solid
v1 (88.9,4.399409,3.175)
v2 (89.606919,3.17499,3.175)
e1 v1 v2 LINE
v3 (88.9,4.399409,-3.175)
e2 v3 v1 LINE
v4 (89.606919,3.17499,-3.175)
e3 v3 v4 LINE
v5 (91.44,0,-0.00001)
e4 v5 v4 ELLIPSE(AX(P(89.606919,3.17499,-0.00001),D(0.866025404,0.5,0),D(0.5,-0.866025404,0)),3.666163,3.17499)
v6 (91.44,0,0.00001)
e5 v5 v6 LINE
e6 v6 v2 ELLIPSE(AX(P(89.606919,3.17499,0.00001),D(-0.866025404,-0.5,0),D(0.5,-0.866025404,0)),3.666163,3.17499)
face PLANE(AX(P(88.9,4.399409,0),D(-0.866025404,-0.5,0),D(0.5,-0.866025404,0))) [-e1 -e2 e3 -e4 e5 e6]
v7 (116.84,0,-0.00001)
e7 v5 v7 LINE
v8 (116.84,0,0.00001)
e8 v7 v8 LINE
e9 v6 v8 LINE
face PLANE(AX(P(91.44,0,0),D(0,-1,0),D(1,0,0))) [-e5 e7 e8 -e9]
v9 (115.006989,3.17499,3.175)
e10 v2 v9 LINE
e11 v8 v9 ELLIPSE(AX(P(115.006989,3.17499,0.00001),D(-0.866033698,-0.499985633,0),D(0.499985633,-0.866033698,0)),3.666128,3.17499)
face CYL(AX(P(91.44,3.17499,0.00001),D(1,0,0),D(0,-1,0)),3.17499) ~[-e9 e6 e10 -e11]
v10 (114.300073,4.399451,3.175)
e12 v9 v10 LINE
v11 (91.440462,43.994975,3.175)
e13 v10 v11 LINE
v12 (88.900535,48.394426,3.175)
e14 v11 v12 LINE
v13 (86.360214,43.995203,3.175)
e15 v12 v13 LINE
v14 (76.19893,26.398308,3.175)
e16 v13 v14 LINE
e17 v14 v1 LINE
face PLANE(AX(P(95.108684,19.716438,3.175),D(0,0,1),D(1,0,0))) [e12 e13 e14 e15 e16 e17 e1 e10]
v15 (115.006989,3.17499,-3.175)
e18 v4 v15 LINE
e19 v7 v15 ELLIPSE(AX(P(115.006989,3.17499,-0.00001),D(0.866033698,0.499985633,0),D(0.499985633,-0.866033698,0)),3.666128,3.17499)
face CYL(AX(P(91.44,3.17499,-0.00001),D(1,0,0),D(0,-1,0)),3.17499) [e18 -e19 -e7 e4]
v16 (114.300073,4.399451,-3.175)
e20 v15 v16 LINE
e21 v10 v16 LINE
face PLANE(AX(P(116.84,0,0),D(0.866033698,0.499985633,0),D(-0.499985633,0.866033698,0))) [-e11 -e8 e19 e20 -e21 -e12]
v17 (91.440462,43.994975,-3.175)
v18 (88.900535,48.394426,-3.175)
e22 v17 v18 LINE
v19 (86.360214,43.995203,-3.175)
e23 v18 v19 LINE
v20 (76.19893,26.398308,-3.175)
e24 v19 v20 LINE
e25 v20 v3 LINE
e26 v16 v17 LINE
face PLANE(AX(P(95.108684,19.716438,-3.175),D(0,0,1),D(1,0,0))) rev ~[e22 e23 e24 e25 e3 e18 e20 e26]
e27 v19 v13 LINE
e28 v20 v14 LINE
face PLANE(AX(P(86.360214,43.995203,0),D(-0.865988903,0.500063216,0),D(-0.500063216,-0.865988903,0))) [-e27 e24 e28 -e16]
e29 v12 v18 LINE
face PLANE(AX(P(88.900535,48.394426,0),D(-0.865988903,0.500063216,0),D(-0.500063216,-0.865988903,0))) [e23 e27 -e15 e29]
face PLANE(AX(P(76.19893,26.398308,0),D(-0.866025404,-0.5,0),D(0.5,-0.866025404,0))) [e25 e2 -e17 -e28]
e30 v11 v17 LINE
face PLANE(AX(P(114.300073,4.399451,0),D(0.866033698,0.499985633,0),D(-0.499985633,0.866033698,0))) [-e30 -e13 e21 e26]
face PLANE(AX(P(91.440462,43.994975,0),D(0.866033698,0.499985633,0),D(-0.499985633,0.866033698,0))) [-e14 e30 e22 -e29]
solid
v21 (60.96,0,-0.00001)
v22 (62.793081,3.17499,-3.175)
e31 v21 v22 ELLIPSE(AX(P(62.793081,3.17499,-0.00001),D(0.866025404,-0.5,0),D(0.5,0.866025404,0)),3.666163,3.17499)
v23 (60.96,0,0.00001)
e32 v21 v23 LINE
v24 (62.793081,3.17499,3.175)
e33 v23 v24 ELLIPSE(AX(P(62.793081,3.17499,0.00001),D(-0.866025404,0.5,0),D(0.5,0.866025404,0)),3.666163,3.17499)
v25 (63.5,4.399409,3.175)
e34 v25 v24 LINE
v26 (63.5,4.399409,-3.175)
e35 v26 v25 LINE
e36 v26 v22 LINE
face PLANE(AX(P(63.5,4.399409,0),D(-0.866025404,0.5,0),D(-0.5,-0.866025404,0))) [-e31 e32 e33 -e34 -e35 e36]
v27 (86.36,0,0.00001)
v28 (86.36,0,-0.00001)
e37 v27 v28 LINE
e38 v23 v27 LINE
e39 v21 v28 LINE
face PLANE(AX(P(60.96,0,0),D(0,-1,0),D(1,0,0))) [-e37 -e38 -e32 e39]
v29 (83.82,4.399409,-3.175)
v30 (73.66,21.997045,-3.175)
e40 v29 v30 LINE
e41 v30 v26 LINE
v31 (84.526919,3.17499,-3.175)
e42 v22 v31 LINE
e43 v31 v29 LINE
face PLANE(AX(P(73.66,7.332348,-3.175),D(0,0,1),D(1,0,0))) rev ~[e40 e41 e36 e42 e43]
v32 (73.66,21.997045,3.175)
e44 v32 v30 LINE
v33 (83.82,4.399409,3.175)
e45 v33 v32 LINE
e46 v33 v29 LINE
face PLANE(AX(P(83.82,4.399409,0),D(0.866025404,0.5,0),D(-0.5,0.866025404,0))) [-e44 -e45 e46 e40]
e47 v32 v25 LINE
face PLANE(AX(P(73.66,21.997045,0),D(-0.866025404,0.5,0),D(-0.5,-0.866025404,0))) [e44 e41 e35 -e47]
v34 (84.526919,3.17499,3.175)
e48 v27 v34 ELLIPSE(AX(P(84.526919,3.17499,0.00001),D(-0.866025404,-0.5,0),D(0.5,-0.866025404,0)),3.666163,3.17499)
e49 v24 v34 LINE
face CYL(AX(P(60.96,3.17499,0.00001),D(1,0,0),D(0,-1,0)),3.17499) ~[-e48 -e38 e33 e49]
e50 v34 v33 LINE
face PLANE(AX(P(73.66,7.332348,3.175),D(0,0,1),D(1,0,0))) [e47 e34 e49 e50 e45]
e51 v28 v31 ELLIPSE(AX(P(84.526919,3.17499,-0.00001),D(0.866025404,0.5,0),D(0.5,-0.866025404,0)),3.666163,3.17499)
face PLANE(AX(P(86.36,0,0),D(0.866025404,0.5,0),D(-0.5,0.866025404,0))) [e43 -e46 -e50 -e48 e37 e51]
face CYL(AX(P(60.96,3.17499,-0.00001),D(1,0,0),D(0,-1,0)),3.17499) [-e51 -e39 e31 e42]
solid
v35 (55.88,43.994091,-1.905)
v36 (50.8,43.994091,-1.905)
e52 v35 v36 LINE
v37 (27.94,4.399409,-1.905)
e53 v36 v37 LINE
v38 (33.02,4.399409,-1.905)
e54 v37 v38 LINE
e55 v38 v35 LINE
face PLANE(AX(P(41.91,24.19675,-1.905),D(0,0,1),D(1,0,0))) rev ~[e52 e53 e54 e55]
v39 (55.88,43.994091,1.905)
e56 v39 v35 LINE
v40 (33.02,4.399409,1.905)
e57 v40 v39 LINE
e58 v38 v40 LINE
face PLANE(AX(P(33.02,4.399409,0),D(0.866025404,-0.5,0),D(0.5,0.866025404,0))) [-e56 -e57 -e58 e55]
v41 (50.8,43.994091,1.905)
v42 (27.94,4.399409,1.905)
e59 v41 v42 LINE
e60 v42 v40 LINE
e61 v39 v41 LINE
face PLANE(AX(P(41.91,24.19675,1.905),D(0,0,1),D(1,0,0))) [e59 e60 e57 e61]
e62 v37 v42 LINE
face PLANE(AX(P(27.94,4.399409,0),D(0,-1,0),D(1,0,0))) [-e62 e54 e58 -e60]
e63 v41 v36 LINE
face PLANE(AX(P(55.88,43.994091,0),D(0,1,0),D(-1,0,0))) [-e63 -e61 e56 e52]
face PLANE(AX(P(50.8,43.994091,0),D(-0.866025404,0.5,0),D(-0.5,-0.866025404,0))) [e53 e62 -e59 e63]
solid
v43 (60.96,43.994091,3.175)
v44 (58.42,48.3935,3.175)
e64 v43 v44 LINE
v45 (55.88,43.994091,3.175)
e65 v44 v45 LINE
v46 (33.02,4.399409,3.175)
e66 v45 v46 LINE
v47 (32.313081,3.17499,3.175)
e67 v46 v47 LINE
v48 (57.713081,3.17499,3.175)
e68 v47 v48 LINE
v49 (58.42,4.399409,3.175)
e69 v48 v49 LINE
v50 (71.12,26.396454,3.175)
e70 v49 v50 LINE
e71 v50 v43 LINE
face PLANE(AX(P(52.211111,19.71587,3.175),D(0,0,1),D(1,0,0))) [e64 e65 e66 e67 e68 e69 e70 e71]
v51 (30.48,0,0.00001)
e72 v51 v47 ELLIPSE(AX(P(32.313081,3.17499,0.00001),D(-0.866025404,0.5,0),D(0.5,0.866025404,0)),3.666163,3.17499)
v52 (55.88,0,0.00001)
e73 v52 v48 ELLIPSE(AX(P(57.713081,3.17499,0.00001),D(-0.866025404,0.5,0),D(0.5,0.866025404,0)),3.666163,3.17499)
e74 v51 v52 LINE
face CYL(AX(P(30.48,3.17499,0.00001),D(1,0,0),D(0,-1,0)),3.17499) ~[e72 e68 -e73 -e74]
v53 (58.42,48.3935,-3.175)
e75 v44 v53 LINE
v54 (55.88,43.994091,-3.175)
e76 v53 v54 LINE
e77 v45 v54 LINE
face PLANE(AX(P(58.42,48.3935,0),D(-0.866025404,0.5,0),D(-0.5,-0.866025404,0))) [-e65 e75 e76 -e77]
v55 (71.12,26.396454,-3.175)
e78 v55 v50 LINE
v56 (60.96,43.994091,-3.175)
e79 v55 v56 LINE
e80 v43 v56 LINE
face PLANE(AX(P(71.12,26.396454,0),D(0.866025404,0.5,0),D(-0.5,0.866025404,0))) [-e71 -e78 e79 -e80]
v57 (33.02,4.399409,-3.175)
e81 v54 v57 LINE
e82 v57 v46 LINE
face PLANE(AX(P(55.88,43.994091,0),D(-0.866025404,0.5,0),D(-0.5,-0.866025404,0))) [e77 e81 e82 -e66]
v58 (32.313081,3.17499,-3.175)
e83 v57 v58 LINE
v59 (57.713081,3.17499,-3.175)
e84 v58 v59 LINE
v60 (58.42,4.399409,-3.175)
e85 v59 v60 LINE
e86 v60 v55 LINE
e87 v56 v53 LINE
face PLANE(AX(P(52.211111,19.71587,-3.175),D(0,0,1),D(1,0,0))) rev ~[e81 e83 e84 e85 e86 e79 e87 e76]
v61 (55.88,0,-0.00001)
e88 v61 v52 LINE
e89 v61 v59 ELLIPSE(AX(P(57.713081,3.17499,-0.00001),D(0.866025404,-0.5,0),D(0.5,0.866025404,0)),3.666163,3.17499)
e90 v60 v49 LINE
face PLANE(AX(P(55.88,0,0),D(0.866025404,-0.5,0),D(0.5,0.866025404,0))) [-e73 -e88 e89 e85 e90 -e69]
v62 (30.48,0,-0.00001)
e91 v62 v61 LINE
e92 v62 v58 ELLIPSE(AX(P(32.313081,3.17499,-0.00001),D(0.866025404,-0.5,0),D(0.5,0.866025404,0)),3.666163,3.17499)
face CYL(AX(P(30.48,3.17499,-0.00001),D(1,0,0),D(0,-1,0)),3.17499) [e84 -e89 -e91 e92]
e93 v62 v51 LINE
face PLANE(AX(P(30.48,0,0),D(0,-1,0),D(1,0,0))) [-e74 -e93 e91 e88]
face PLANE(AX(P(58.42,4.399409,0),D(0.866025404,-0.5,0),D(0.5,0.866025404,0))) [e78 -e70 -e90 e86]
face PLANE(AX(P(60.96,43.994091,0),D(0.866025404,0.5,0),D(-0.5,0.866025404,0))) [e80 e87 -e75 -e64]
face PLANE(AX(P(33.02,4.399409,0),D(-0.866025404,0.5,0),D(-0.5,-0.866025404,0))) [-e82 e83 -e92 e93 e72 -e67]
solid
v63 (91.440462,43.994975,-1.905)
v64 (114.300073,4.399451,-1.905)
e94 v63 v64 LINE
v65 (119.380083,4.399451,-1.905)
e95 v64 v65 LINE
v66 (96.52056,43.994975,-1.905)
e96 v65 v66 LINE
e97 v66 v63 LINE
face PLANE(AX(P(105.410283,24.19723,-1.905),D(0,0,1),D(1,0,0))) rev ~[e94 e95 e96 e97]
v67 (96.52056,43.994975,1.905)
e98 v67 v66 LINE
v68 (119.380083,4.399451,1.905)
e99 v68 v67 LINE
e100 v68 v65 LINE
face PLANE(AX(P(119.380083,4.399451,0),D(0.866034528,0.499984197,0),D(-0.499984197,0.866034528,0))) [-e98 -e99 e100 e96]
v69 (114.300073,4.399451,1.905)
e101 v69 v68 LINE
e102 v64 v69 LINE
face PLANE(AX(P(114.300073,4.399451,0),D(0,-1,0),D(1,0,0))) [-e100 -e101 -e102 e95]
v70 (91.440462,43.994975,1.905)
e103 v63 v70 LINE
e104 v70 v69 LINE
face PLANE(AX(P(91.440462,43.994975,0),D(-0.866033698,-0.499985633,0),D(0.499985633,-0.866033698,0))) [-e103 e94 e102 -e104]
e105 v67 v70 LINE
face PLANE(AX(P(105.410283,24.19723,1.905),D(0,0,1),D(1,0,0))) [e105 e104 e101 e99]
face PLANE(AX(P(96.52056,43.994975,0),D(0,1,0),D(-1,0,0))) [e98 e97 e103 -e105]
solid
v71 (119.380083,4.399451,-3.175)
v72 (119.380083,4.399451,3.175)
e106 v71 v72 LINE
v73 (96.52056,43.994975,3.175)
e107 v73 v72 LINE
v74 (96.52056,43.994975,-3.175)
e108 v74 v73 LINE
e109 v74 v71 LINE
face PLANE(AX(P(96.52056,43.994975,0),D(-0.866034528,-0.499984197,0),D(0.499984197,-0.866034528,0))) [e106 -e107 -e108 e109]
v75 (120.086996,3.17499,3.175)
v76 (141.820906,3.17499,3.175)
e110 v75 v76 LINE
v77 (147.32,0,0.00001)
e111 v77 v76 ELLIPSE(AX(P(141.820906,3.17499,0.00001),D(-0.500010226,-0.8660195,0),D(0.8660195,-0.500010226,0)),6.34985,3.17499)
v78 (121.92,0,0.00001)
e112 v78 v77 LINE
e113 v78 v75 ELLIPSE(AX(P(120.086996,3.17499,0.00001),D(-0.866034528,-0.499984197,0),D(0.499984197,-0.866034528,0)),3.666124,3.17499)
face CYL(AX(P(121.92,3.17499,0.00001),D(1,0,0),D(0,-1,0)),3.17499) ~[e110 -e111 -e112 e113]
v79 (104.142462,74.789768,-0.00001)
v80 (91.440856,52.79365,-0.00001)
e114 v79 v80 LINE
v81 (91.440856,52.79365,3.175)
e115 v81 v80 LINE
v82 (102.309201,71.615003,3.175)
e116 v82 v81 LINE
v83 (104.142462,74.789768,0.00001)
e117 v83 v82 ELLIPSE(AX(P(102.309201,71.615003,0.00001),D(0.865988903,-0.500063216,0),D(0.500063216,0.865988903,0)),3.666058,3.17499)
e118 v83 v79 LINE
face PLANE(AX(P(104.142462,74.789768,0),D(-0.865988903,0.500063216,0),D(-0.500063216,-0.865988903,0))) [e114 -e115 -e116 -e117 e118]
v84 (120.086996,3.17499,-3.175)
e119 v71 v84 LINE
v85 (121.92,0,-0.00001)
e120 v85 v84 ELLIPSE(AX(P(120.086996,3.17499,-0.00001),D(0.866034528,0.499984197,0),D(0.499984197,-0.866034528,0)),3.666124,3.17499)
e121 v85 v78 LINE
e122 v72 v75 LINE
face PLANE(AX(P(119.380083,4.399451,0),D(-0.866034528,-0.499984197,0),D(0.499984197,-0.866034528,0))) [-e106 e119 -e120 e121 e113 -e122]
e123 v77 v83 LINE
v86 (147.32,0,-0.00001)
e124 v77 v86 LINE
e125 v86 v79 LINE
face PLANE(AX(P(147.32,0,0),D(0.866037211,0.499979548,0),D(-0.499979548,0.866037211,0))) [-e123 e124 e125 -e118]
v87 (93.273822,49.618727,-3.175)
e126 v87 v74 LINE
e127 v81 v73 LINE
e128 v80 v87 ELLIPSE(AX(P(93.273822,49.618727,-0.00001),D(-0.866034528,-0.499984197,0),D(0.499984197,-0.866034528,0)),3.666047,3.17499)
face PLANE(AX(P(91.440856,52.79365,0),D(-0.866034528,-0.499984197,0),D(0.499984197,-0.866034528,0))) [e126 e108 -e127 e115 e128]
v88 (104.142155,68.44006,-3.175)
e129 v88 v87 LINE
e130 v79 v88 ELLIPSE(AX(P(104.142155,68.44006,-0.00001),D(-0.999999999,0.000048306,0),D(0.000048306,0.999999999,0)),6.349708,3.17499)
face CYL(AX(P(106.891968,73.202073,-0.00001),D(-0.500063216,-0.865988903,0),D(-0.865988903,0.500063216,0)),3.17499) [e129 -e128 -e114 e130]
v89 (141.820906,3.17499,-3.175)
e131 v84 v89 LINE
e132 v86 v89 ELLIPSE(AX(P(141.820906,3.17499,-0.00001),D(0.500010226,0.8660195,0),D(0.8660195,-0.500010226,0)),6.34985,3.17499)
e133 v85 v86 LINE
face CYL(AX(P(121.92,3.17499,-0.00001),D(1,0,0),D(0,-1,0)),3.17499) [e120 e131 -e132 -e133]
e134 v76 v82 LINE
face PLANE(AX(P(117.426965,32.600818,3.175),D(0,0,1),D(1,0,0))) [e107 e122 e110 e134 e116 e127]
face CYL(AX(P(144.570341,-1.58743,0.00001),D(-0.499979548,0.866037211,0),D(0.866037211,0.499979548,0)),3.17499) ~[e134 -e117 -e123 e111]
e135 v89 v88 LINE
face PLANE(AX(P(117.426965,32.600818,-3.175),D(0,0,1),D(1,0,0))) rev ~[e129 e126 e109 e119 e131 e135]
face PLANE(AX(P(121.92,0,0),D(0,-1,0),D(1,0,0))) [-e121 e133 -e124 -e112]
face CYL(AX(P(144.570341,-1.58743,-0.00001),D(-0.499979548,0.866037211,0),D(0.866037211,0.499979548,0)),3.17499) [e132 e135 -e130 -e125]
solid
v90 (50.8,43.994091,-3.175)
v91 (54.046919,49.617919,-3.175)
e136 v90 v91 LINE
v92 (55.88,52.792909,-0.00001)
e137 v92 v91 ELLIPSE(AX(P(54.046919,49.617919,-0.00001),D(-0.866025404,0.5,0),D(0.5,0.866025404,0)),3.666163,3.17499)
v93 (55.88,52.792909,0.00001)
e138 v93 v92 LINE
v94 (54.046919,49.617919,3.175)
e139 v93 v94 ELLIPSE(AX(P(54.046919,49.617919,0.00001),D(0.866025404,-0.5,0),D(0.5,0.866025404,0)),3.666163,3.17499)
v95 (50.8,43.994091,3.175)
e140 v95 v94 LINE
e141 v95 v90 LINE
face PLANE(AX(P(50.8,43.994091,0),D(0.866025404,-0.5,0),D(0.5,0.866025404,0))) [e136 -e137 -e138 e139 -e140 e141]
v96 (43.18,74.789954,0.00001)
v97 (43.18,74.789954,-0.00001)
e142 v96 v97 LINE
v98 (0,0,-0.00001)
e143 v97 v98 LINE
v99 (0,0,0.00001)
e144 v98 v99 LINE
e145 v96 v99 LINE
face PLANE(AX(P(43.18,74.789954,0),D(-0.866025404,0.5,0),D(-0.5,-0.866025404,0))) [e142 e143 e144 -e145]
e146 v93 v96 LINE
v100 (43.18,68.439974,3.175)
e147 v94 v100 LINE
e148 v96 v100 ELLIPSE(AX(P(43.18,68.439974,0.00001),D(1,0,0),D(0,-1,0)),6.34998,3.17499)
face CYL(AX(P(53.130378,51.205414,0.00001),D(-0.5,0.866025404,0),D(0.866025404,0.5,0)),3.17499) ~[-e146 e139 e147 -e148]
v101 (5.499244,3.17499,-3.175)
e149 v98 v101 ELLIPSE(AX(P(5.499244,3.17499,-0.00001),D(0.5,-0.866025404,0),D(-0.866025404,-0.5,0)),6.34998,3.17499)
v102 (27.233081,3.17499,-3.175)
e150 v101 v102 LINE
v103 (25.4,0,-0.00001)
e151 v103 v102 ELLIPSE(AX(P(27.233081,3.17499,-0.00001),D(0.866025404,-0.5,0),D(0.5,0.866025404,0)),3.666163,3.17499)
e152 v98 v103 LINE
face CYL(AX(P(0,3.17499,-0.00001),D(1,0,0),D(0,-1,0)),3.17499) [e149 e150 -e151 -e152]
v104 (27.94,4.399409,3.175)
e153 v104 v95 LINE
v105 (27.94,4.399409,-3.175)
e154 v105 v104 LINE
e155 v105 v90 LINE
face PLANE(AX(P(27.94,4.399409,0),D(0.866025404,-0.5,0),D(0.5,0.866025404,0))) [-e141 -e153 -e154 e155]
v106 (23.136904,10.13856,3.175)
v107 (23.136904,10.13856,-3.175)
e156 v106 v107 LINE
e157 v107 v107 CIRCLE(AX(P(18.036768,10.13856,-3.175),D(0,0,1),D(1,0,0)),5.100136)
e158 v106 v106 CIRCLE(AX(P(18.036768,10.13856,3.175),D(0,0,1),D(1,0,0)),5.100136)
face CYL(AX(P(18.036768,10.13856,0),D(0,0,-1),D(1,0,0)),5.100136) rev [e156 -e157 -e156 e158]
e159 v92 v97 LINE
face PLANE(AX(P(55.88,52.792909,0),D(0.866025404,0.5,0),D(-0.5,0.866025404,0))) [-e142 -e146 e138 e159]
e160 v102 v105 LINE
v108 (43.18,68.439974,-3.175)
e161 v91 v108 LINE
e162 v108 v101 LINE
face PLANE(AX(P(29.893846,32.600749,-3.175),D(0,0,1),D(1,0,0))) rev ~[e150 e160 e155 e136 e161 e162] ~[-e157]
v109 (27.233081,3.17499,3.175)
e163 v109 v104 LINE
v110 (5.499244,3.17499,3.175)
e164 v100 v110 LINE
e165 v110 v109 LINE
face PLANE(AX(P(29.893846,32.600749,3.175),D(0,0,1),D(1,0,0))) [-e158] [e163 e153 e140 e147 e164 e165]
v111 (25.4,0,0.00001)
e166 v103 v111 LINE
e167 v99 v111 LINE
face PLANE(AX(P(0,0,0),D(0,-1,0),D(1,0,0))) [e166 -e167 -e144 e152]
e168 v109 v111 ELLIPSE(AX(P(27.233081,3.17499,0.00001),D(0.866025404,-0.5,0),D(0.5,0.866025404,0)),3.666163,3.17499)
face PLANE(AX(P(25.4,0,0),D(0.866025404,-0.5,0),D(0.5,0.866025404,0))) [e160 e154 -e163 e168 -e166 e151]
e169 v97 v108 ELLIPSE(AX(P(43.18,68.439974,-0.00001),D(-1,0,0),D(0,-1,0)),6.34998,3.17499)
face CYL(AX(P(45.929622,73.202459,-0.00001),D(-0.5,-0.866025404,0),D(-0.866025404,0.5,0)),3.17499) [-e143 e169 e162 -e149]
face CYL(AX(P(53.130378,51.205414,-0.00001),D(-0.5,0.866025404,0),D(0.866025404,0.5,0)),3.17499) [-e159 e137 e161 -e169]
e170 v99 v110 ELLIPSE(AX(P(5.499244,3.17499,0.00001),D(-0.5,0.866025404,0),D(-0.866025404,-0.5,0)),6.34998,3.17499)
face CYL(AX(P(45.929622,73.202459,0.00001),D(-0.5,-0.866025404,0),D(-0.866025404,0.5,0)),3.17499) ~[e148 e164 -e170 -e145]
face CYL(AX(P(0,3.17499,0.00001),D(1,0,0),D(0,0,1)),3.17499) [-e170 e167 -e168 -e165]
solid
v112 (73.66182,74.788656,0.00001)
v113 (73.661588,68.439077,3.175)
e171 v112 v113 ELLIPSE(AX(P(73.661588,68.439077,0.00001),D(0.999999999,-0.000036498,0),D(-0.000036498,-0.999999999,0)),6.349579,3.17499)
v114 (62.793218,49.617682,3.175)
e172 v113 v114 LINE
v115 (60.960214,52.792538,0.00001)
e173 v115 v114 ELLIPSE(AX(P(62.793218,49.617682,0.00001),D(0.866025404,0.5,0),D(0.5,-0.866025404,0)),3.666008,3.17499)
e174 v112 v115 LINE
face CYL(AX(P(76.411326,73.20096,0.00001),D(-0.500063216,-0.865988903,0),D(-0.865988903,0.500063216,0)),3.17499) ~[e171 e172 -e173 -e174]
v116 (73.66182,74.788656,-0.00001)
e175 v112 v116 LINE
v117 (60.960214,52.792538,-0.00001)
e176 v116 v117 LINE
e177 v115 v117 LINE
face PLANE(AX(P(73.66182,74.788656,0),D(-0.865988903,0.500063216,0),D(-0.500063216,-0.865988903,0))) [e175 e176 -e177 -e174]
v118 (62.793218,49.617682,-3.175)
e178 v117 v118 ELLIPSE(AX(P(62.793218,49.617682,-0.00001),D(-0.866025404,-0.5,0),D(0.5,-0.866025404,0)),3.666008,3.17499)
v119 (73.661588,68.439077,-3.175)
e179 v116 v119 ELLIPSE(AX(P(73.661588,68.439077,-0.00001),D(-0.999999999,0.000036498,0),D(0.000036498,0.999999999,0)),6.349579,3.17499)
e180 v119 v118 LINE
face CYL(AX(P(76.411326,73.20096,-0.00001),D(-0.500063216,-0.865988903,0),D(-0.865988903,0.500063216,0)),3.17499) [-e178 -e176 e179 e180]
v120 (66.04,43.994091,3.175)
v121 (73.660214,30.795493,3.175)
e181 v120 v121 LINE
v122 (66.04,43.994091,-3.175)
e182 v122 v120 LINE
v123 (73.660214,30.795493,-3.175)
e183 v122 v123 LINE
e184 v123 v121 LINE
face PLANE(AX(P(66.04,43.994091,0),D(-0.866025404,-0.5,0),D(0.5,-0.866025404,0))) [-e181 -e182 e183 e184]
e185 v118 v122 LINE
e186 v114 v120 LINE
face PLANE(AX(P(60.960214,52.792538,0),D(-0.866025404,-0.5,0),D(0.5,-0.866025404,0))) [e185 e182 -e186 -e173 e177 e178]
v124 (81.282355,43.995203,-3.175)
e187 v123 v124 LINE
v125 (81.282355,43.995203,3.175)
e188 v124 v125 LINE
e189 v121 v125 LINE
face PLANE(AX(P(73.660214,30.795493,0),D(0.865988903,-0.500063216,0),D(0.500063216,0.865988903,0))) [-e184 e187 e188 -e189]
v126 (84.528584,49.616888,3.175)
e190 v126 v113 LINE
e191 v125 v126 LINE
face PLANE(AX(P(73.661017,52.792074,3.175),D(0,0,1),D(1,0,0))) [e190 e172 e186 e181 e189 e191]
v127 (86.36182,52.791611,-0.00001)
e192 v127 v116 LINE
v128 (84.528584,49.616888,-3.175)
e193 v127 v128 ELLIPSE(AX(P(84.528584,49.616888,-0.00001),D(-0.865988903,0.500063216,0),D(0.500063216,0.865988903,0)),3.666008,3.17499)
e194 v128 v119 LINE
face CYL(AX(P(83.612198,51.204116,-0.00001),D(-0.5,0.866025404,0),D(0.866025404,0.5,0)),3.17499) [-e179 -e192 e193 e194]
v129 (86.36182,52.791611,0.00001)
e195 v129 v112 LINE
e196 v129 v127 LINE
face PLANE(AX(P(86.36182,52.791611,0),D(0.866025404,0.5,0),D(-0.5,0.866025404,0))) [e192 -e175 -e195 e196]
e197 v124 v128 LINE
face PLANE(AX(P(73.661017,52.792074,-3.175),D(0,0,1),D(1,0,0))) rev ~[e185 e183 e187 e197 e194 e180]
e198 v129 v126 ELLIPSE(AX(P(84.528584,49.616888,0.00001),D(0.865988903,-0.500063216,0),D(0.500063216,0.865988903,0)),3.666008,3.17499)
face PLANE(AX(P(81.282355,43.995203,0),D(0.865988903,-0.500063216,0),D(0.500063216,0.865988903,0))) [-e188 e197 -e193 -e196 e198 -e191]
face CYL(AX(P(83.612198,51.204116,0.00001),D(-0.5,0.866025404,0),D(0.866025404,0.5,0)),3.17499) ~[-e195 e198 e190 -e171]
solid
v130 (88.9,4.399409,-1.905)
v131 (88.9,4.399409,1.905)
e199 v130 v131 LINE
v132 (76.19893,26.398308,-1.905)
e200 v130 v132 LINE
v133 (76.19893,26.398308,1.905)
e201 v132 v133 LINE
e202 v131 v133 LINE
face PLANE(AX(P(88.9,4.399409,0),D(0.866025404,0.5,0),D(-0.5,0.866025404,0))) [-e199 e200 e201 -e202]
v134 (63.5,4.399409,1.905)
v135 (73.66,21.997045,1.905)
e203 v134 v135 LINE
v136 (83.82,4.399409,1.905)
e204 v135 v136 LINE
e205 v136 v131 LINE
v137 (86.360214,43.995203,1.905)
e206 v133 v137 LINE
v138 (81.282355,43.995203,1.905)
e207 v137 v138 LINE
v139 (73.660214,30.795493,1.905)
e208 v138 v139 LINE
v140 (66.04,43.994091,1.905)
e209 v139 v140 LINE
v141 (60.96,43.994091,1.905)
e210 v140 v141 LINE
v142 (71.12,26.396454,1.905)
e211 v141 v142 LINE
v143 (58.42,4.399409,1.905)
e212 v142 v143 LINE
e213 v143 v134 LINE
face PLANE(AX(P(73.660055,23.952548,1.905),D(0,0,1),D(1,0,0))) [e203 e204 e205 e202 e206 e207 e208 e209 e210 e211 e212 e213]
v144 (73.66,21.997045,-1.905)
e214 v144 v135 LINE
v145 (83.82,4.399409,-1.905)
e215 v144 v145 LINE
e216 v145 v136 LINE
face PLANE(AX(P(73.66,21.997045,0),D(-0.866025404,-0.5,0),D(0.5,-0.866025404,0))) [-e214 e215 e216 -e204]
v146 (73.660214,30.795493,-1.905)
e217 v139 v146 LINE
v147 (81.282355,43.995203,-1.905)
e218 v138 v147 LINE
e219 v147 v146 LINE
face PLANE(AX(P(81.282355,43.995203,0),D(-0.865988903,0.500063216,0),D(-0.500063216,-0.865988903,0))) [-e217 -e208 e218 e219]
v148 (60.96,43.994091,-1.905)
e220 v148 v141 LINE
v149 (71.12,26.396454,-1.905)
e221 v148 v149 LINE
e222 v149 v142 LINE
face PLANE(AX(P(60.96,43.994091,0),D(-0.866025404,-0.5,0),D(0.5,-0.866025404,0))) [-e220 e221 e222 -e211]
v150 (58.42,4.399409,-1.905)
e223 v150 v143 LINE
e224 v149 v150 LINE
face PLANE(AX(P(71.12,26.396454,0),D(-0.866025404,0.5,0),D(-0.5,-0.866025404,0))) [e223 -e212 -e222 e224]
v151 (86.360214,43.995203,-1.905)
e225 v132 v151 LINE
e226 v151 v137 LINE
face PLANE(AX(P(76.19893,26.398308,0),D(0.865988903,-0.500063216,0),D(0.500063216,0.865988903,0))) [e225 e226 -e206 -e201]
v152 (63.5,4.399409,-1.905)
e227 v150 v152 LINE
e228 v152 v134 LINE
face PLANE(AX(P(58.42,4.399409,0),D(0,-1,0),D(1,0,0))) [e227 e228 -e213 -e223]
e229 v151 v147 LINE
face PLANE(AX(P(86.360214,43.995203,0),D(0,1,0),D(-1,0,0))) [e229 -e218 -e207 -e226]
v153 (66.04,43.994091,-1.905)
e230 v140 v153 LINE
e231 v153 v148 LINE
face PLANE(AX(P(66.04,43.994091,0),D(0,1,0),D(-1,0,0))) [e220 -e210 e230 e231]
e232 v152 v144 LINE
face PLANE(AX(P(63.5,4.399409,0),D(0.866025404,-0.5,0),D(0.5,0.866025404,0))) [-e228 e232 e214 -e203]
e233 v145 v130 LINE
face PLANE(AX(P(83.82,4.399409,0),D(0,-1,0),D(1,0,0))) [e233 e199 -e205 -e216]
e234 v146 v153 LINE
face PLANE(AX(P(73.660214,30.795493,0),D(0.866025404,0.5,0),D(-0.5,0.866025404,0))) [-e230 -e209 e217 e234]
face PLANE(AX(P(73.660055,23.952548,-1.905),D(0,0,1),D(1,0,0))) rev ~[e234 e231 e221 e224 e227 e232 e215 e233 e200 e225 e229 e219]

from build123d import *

# Parameters (mm, degrees)
F1_DEPTH = 3.175
F0_R     = 5.1001358677
F2_DEPTH = 1.905
F3_R     = 3.17499
F3_2_R   = 3.17499
F3_3_R   = 3.17499
F3_4_R   = 3.17499
F3_5_R   = 3.17499
F3_6_R   = 3.17499


# Not quite as in the source:
# - a fillet or chamfer is up to 0.001 mm smaller than in the source, because OpenCascade refuses the exact size


with BuildPart() as f1:
    # F0 (on Top) → F1 (new body, symmetric)
    with BuildSketch(Plane.XY):
        Polygon((55.88, 43.9940905122), (33.02, 4.3994090512), (30.48, 0), (55.88, 0), (58.42, 4.3994090512), (71.12, 26.3964543073), (60.96, 43.9940905122), (58.42, 48.3934995635), align=None)
    extrude(amount=F1_DEPTH, both=True)

    # F3#3 (radius 3.175 in the source; OpenCascade refuses exactly that, so slightly less here)
    f3_3_edges = [f1.edges().sort_by_distance(p)[0] for p in [
        (43.18, 0, -3.175),
        (43.18, 0, 3.175),
    ]]
    fillet(f3_3_edges, radius=F3_3_R)


with BuildPart() as f1b:
    # F0 (on Top) → F1, piece 2 (new body, symmetric)
    with BuildSketch(Plane.XY):
        Polygon((60.9602140859, 52.792537807), (66.04, 43.9940905122), (73.6602140859, 30.7954925508), (81.2823551529, 43.9952028573), (86.3618197643, 52.79161069), (73.6618197643, 74.7886559461), align=None)
    extrude(amount=F1_DEPTH, both=True)

    # F3#2 (radius 3.175 in the source; OpenCascade refuses exactly that, so slightly less here)
    f3_2_edges = [f1b.edges().sort_by_distance(p)[0] for p in [
        (67.311017, 63.790597, 3.175),
        (80.01182, 63.790133, 3.175),
        (80.01182, 63.790133, -3.175),
        (67.311017, 63.790597, -3.175),
    ]]
    fillet(f3_2_edges, radius=F3_2_R)


with BuildPart() as f1c:
    # F0 (on Top) → F1, piece 3 (new body, symmetric)
    with BuildSketch(Plane.XY):
        Polygon((88.9005352487, 48.3944264851), (86.360214113, 43.9952028573), (76.1989295703, 26.398308346), (88.9, 4.3994090512), (91.44, 0), (116.84, 0), (114.300072982, 4.3994511866), (91.4404622667, 43.9949752986), align=None)
    extrude(amount=F1_DEPTH, both=True)

    # F3#5 (radius 3.175 in the source; OpenCascade refuses exactly that, so slightly less here)
    f3_5_edges = [f1c.edges().sort_by_distance(p)[0] for p in [
        (104.14, 0, -3.175),
        (104.14, 0, 3.175),
    ]]
    fillet(f3_5_edges, radius=F3_5_R)


with BuildPart() as f1d:
    # F0 (on Top) → F1, piece 4 (new body, symmetric)
    with BuildSketch(Plane.XY):
        Polygon((73.66, 21.9970452561), (63.5, 4.3994090512), (60.96, 0), (86.36, 0), (83.82, 4.3994090512), align=None)
    extrude(amount=F1_DEPTH, both=True)

    # F3#4 (radius 3.175 in the source; OpenCascade refuses exactly that, so slightly less here)
    f3_4_edges = [f1d.edges().sort_by_distance(p)[0] for p in [
        (73.66, 0, -3.175),
        (73.66, 0, 3.175),
    ]]
    fillet(f3_4_edges, radius=F3_4_R)


with BuildPart() as f1e:
    # F0 (on Top) → F1, piece 5 (new body, symmetric)
    with BuildSketch(Plane.XY):
        Polygon((91.4408563844, 52.793650113), (96.520559582, 43.9949752986), (119.3800827134, 4.3994511866), (121.92, 0), (147.32, 0), (104.1424620628, 74.7897682521), align=None)
    extrude(amount=F1_DEPTH, both=True)

    # F3#6 (radius 3.175 in the source; OpenCascade refuses exactly that, so slightly less here)
    f3_6_edges = [f1e.edges().sort_by_distance(p)[0] for p in [
        (134.62, 0, -3.175),
        (125.731231, 37.394884, -3.175),
        (97.791659, 63.791709, -3.175),
        (134.62, 0, 3.175),
        (125.731231, 37.394884, 3.175),
    ]]
    fillet(f3_6_edges, radius=F3_6_R)


with BuildPart() as f1f:
    # F0 (on Top) → F1, piece 6 (new body, symmetric)
    with BuildSketch(Plane.XY):
        Polygon((43.18, 74.7899538708), (0, 0), (25.4, 0), (27.94, 4.3994090512), (50.8, 43.9940905122), (55.88, 52.7929086147), align=None)
        with Locations((18.0367678404, 10.1385600865)):
            Circle(F0_R, mode=Mode.SUBTRACT)
    extrude(amount=F1_DEPTH, both=True)

    # F3 (radius 3.175 in the source; OpenCascade refuses exactly that, so slightly less here)
    f3_edges = [f1f.edges().sort_by_distance(p)[0] for p in [
        (21.59, 37.394977, 3.175),
        (21.59, 37.394977, -3.175),
        (12.7, 0, -3.175),
        (12.7, 0, 3.175),
        (49.53, 63.791431, 3.175),
        (49.53, 63.791431, -3.175),
    ]]
    fillet(f3_edges, radius=F3_R)


with BuildPart() as f2:
    # F0 (on Top) → F2 (new body, symmetric)
    with BuildSketch(Plane.XY):
        Polygon((96.520559582, 43.9949752986), (91.4404622667, 43.9949752986), (114.300072982, 4.3994511866), (119.3800827134, 4.3994511866), align=None)
    extrude(amount=F2_DEPTH, both=True)


with BuildPart() as f2b:
    # F0 (on Top) → F2, piece 2 (new body, symmetric)
    with BuildSketch(Plane.XY):
        Polygon((66.04, 43.9940905122), (60.96, 43.9940905122), (71.12, 26.3964543073), (58.42, 4.3994090512), (63.5, 4.3994090512), (73.66, 21.9970452561), (83.82, 4.3994090512), (88.9, 4.3994090512), (76.1989295703, 26.398308346), (86.360214113, 43.9952028573), (81.2823551529, 43.9952028573), (73.6602140859, 30.7954925508), align=None)
    extrude(amount=F2_DEPTH, both=True)


with BuildPart() as f2c:
    # F0 (on Top) → F2, piece 3 (new body, symmetric)
    with BuildSketch(Plane.XY):
        Polygon((50.8, 43.9940905122), (27.94, 4.3994090512), (33.02, 4.3994090512), (55.88, 43.9940905122), align=None)
    extrude(amount=F2_DEPTH, both=True)


solid = Compound([f1.part, f1b.part, f1c.part, f1d.part, f1e.part, f1f.part, f2.part, f2b.part, f2c.part])
